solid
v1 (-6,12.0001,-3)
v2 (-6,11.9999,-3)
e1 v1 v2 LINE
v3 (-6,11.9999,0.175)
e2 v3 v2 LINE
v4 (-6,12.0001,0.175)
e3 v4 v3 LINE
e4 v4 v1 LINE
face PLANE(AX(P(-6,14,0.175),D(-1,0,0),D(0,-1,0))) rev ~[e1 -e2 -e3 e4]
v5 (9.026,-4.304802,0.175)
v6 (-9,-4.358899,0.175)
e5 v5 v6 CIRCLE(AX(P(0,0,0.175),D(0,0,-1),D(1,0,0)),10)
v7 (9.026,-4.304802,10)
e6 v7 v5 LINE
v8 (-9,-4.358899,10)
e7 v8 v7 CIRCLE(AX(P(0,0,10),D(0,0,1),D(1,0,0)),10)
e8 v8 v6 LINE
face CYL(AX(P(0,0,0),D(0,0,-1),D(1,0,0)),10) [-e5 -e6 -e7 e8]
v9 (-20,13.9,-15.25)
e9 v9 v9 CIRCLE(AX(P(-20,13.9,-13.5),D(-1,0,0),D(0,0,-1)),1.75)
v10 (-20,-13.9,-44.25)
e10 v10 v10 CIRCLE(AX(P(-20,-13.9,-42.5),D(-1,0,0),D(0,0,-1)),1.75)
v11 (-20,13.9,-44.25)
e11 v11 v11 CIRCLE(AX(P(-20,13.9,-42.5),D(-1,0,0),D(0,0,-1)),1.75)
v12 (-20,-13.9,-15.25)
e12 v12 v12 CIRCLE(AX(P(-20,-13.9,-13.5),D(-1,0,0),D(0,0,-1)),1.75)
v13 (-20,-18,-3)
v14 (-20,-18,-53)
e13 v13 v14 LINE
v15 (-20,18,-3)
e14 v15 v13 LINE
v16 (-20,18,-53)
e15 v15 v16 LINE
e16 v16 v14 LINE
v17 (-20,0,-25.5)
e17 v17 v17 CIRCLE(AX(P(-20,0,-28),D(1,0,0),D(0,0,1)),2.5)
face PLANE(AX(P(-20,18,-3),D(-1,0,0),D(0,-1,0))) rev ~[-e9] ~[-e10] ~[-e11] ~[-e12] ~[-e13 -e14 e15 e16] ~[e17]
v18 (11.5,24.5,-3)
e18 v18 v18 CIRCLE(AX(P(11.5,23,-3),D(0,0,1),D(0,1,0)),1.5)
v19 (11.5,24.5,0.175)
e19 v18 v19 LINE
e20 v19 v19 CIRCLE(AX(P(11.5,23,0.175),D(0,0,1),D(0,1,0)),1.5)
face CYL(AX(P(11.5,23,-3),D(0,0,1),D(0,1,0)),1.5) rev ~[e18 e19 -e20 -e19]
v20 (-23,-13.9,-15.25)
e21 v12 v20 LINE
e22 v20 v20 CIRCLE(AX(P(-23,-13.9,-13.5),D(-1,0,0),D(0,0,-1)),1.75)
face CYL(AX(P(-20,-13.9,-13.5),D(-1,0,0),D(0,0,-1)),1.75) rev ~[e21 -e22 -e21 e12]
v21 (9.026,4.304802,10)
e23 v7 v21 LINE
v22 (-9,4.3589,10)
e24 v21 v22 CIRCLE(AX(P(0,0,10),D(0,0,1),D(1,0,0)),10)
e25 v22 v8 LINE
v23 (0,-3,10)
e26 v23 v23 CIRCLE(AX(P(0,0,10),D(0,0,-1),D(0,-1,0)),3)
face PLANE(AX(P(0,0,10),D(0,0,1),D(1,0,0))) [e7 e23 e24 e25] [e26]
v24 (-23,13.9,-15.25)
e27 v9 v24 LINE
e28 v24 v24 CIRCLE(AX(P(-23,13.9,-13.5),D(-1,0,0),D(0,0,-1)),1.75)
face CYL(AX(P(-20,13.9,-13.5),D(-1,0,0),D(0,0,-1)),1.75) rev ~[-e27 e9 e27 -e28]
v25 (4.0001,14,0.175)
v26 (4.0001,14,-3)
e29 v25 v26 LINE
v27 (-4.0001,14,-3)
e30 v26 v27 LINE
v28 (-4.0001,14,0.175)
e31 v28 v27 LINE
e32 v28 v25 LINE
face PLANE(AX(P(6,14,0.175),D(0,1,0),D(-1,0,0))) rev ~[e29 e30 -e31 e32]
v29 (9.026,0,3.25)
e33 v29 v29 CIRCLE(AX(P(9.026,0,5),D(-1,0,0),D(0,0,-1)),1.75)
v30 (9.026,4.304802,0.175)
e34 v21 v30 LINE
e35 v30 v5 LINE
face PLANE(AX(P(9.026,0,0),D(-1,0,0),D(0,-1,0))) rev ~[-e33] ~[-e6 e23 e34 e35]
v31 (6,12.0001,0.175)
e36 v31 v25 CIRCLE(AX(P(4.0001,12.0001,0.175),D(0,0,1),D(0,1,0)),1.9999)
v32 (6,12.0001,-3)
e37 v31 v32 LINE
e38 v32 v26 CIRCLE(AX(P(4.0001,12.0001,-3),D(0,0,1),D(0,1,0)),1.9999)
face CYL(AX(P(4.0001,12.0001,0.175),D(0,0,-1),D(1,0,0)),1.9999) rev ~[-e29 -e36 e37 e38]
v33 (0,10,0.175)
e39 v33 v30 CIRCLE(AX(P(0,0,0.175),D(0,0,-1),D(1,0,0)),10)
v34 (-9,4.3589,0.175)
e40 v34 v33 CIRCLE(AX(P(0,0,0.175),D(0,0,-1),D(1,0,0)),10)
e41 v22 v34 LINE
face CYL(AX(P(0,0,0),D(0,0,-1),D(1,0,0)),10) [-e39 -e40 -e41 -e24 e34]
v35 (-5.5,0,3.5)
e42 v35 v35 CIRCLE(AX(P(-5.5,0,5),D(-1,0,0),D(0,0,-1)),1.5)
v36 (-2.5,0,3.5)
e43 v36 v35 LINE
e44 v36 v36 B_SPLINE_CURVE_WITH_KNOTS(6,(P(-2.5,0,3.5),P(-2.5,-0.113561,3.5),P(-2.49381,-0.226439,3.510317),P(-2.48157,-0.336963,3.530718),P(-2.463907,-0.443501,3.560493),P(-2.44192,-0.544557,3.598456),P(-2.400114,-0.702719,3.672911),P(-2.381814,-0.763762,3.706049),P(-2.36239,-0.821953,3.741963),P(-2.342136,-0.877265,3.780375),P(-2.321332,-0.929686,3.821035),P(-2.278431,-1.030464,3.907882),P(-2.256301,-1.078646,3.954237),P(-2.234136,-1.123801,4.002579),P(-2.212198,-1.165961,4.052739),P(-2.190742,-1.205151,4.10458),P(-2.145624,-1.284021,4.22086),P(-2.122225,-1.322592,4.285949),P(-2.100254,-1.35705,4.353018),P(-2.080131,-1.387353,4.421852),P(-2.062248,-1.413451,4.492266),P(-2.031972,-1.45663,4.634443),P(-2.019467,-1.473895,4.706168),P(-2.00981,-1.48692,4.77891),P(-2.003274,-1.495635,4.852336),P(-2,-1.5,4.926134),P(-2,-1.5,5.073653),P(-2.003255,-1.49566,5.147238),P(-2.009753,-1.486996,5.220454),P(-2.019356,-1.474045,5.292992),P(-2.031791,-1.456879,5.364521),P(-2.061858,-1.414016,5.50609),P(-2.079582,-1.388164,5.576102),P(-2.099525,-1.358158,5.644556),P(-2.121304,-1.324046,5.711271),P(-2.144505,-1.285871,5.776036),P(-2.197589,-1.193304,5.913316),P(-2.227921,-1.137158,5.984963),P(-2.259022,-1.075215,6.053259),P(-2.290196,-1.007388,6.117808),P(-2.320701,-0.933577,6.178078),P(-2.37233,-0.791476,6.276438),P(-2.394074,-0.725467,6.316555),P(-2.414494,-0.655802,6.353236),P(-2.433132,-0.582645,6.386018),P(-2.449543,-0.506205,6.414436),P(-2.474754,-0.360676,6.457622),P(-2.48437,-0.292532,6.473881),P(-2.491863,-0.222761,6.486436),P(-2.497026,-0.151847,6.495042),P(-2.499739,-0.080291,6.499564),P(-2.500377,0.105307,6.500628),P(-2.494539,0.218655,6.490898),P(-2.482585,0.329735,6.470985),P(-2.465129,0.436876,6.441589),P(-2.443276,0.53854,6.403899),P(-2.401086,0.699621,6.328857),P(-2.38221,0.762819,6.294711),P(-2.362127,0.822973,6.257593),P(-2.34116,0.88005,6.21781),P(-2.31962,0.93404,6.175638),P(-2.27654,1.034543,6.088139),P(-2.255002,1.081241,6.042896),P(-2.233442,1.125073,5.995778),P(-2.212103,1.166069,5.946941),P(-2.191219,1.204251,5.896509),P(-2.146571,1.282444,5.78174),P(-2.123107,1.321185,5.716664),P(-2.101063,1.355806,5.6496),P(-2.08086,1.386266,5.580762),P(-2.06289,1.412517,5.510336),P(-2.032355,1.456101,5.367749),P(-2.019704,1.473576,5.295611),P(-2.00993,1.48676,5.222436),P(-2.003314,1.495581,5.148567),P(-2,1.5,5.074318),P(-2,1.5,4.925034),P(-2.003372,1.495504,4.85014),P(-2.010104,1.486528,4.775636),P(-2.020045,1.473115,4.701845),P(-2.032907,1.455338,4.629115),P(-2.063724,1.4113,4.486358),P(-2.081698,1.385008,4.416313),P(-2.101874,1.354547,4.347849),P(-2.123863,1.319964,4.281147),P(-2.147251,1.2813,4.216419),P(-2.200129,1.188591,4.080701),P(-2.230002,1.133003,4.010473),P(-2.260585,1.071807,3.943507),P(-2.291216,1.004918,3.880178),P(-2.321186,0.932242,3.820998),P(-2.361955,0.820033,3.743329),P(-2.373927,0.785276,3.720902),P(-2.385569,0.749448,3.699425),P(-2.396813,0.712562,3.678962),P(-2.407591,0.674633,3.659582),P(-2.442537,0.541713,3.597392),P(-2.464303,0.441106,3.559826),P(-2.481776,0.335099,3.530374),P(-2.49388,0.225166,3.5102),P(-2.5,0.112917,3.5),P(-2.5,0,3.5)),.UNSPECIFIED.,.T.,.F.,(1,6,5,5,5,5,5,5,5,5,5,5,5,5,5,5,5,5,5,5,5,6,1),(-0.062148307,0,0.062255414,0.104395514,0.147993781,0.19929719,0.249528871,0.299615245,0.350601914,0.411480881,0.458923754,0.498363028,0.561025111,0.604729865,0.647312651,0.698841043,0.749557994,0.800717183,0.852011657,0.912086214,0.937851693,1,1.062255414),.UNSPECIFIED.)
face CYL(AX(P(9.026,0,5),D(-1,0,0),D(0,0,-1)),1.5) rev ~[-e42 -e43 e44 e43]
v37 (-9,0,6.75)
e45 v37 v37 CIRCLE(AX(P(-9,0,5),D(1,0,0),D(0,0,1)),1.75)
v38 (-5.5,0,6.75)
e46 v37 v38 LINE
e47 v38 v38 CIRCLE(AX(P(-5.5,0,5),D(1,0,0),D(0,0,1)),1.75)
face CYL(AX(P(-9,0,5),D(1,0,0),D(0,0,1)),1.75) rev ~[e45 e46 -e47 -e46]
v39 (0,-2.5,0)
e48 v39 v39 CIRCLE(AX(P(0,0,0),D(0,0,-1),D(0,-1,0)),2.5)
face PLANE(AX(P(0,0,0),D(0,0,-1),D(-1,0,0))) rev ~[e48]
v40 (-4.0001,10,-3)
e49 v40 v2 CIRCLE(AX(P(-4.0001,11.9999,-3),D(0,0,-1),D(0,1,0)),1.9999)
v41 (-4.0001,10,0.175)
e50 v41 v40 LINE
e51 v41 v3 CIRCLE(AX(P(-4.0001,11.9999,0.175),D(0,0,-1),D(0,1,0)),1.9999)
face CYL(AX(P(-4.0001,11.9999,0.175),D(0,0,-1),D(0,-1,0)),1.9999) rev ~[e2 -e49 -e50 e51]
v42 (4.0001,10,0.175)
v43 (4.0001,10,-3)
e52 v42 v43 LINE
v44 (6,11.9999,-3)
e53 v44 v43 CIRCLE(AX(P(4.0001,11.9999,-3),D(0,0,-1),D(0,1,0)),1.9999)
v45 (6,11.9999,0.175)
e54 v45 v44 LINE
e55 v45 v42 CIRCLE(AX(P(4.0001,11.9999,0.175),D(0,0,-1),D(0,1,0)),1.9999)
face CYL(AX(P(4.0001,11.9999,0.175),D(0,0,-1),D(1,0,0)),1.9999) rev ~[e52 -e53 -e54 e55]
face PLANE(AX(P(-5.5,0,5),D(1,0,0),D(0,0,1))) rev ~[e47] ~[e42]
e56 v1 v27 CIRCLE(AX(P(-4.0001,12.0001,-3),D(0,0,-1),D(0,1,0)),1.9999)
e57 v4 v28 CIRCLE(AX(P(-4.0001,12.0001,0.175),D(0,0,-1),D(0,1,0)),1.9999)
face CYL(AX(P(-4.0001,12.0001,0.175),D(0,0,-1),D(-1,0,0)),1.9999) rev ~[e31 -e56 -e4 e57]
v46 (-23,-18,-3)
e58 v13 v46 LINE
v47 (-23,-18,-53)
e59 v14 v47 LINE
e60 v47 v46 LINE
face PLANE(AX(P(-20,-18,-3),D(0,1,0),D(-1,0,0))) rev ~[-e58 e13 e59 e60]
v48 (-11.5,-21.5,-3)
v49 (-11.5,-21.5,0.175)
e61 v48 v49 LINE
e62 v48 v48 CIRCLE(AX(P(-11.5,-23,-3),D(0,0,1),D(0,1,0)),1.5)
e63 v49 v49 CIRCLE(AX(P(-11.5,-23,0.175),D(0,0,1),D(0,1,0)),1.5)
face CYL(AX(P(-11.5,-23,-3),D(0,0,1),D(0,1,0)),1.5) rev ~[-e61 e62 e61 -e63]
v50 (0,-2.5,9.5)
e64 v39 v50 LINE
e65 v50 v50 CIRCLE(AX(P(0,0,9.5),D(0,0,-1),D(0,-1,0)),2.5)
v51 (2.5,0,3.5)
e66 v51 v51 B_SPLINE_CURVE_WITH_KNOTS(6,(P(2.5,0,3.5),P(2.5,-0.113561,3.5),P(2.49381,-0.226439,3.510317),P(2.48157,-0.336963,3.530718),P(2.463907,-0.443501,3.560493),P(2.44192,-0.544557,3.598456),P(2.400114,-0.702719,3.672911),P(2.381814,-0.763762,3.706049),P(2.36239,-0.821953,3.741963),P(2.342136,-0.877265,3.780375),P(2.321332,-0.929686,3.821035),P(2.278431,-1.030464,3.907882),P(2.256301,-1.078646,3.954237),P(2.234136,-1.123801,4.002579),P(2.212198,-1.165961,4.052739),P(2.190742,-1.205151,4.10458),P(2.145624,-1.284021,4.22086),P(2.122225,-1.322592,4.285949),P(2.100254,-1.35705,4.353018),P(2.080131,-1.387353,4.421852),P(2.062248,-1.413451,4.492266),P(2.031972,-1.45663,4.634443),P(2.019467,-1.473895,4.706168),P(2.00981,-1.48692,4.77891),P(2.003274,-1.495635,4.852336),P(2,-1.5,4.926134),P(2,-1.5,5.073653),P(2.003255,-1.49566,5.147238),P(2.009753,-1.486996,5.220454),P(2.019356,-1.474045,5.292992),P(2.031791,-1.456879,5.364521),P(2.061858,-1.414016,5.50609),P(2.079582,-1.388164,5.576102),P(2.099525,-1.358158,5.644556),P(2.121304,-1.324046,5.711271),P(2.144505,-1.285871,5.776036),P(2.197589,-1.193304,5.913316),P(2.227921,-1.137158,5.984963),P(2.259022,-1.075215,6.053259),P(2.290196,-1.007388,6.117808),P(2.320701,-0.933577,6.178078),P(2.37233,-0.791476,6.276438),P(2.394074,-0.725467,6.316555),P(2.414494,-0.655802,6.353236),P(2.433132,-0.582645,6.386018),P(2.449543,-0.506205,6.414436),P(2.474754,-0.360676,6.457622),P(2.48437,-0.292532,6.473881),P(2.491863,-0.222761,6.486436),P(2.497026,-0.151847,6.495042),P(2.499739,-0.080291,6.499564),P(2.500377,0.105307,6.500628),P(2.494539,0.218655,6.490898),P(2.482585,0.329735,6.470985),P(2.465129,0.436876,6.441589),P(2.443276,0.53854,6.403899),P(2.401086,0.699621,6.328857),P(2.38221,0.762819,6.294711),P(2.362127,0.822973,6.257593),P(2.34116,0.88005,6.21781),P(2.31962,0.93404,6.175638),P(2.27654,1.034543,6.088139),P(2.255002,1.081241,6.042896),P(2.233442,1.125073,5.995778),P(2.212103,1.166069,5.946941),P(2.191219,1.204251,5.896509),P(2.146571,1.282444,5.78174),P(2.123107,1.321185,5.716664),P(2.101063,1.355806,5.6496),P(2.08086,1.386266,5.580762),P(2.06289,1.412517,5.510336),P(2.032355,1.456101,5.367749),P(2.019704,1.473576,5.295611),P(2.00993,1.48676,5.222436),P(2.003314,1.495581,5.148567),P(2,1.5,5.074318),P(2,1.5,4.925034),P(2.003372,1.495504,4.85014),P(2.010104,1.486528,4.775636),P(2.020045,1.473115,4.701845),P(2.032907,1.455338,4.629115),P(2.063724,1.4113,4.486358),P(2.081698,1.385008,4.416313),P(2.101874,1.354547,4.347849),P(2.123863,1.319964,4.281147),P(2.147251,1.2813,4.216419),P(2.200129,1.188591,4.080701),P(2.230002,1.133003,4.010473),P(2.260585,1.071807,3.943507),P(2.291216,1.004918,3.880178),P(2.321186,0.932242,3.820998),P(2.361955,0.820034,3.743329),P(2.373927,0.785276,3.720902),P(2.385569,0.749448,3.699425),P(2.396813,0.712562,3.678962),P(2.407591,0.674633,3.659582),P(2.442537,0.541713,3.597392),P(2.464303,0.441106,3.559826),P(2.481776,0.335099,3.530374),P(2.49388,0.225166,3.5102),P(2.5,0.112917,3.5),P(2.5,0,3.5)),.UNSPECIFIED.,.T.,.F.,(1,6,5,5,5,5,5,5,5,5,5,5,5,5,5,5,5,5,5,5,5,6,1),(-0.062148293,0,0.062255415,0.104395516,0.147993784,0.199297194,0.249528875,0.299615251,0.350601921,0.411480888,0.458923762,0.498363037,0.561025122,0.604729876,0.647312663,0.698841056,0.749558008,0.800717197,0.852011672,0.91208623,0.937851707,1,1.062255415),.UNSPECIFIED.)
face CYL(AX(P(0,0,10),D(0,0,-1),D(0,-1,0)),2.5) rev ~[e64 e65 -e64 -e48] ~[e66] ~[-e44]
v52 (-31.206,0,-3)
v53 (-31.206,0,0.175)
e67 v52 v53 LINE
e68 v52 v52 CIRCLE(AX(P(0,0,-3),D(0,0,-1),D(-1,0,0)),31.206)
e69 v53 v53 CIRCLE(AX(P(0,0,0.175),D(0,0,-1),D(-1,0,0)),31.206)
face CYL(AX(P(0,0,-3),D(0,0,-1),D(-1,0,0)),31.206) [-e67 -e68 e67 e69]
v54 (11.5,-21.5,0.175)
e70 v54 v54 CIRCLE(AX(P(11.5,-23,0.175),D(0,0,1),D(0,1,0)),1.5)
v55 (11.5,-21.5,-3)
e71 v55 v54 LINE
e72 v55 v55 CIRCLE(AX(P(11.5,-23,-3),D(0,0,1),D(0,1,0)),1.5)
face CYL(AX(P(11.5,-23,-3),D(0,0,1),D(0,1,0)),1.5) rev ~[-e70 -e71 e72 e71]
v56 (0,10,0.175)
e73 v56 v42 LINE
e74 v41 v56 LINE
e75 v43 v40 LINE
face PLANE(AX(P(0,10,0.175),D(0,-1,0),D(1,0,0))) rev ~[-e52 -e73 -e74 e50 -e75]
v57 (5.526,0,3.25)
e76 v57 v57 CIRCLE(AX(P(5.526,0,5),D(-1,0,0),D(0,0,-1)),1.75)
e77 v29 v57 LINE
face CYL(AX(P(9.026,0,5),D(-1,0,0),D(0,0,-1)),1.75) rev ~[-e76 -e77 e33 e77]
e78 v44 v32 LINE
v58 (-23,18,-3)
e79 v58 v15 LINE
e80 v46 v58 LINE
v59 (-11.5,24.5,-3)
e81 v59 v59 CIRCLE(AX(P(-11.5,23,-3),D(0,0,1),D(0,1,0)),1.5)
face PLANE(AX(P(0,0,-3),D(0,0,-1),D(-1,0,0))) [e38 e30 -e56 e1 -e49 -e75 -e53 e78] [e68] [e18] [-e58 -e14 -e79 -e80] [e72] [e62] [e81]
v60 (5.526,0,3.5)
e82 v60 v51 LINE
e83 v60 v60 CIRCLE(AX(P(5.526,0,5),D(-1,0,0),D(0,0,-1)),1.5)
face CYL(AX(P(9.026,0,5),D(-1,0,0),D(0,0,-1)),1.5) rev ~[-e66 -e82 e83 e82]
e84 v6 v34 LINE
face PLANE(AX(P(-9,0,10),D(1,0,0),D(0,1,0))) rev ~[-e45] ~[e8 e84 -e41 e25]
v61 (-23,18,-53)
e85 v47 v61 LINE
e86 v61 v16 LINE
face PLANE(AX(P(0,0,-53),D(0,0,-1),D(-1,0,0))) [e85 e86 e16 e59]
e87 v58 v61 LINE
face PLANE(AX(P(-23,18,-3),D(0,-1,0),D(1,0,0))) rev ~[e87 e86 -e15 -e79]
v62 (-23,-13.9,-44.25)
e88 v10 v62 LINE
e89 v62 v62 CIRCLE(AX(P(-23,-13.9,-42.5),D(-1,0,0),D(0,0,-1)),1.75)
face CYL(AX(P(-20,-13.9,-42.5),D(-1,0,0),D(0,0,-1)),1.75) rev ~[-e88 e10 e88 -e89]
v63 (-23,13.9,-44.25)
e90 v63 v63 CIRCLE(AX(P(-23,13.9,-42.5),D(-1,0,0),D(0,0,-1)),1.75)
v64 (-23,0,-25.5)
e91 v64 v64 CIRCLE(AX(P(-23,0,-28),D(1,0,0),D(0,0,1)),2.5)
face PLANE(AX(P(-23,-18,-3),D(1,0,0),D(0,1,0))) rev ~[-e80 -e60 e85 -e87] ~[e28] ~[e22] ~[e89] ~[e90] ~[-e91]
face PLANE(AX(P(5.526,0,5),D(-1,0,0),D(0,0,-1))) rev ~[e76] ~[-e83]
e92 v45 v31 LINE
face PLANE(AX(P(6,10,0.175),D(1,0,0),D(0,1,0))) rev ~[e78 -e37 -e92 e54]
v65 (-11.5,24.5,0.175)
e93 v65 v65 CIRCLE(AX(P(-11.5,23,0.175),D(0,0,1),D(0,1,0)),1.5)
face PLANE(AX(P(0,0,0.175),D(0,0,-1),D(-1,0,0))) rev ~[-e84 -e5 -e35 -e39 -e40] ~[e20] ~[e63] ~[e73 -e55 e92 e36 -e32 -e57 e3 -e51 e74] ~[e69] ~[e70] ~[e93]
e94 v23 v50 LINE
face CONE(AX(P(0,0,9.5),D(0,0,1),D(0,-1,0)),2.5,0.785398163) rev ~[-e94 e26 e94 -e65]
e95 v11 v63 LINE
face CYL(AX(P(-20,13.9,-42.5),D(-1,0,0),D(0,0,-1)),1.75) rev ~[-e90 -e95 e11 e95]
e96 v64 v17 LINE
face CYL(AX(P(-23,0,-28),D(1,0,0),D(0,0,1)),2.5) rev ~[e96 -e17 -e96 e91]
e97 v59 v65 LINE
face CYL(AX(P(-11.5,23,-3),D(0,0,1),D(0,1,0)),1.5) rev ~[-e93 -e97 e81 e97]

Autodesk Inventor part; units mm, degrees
ref_plane "YZ Plane" through (0, 0, 0) normal (1, 0, 0) x (0, 1, 0)
ref_plane "XZ Plane" through (0, 0, 0) normal (0, 1, 0) x (-1, 0, 0)
ref_plane "XY Plane" through (0, 0, 0) normal (0, 0, 1) x (1, 0, 0)
sketch "Sketch1" plane through (0, 0, 0) normal (0, 0, 1) x (1, 0, 0)
  circle A0 centre (0, 0) radius 10
  dimension "d0" = 20
extrude "Extrusion1" add sketch "Sketch1" along normal blind 10
sketch "Sketch2" plane through (0, 0, 10) normal (0, 0, 1) x (1, 0, 0)
  point P0 (0, 0)
  point P1 (0, 0)
hole "Hole1" at (0, 0, 10) direction (0, 0, -1) diameter 5 end through all
chamfer "Chamfer1" distance 0.5 angle 45 1 edges at (0, 2.5, 10)
sketch "Sketch3" plane through (0, 0, 10) normal (0, 0, 1) x (1, 0, 0)
  circle A0 centre (0, 0) radius 10 projected
  line L0 (-10, 0) -> (-9, 0)
  line L1 (-9, 0) -> (-9, 4.3589)
  line L2 (-9, 4.3589) -> (-10, 4.3589)
  line L3 (-10, 4.3589) -> (-10, 0)
  line L4 (-10, 0) -> (-9, 0)
  line L5 (-9, 0) -> (-9, -4.4002)
  line L6 (-9, -4.4002) -> (-10, -4.4002)
  line L7 (-10, -4.4002) -> (-10, 0)
  line L8 (10.026, 0) -> (9.026, 0)
  line L9 (9.026, 0) -> (9.026, 4.3589)
  line L10 (9.026, 4.3589) -> (10.026, 4.3589)
  line L11 (10.026, 4.3589) -> (10.026, 0)
  line L12 (10.026, 0) -> (9.026, 0)
  line L13 (9.026, 0) -> (9.026, -4.4002)
  line L14 (9.026, -4.4002) -> (10.026, -4.4002)
  line L15 (10.026, -4.4002) -> (10.026, 0)
  dimension "d13" = 1
  dimension "d14" = 1
  dimension "d15" = 1
extrude "Extrusion2" cut sketch "Sketch3" against normal blind 10 contours L1 L0 A0 | L0 L5 A0 | A0 L5 L6 L7 | L9 L10 L11 L8 A0 | A0 L8 L9 | L8 L15 L14 L13 A0 | A0 L13 L8
sketch "Sketch4" plane through (9.026, -4.3048, 10) normal (1, 0, 0) x (0, 0, -1)
  line L0 (10, 4.3048) -> (5, 4.3048)
  line L1 (0.5, 1.8048) -> (0.5, 6.8048) projected
  dimension "d18" = 5
hole "Hole2" at (9.026, 0, 5) direction (-1, 0, 0) diameter 3 end through all
sketch "Sketch5" plane through (9.026, -4.3048, 10) normal (1, 0, 0) x (0, 0, -1)
  circle A0 centre (5, 4.3048) radius 1.5 projected
  point P0 (10, 4.3048)
hole "Hole3" at (9.026, 0, 5) direction (-1, 0, 0) diameter 3.5 depth 3.5
sketch "Sketch6" plane through (-9, -4.3589, 10) normal (-1, 0, 0) x (0, 0, 1)
  circle A0 centre (-5, 4.3589) radius 1.5 projected
  point P0 (-10, 4.3589)
hole "Hole4" at (-9, 0, 5) direction (1, 0, 0) diameter 3.5 depth 3.5
sketch "Sketch7" plane through (0, 0, 0) normal (0, 0, -1) x (-1, 0, 0)
  line L0 (0, 0) -> (-9.026, 0)
  line L1 (-9.026, 0) -> (-9.026, 18)
  line L2 (-9.026, 18) -> (0, 18)
  line L3 (0, 18) -> (0, 0)
  line L4 (0, 0) -> (-9.026, 0)
  line L5 (-9.026, 0) -> (-9.026, -18)
  line L6 (-9.026, -18) -> (0, -18)
  line L7 (0, -18) -> (0, 0)
  line L8 (0, 18) -> (23, 18)
  line L9 (23, 18) -> (23, -18)
  line L10 (23, -18) -> (0, -18)
  line L11 (0, -18) -> (0, 18)
  dimension "d40" = 9.026
  dimension "d41" = 18
  dimension "d42" = 18
  dimension "d43" = 23
extrude "Extrusion3" add sketch "Sketch7" along normal blind 3
sketch "Sketch8" plane through (0, 0, -3) normal (0, 0, -1) x (-1, 0, 0)
  line L0 (23, 18) -> (-9.026, 18) projected
  line L1 (-9.026, -18) -> (23, -18) projected
  line L2 (23, 18) -> (20, 18)
  line L3 (20, 18) -> (20, -18)
  line L4 (20, -18) -> (23, -18)
  line L5 (23, -18) -> (23, 18)
  point P0 (0, 0)
  dimension "d46" = 3
extrude "Extrusion4" add sketch "Sketch8" along normal blind 50
sketch "Sketch9" plane through (-20, -18, -3) normal (1, 0, 0) x (0, 0, -1)
  line L0 (0, 0) -> (0, 36) projected
  line L1 (0, 36) -> (25, 36)
  line L2 (-3, 36) -> (50, 36) projected
  line L3 (25, 36) -> (25, 18)
  line L4 (-3, 0) -> (50, 0) projected
  line L5 (25, 18) -> (39.5, 18)
  line L6 (39.5, 18) -> (39.5, 31.9)
  line L7 (39.5, 31.9) -> (25, 31.9)
  line L8 (25, 31.9) -> (25, 18)
  line L9 (25, 18) -> (39.5, 18)
  line L10 (39.5, 18) -> (39.5, 4.1)
  line L11 (39.5, 4.1) -> (25, 4.1)
  line L12 (25, 4.1) -> (25, 18)
  line L13 (25, 18) -> (10.5, 18)
  line L14 (10.5, 18) -> (10.5, 31.9)
  line L15 (10.5, 31.9) -> (25, 31.9)
  line L16 (25, 31.9) -> (25, 18)
  line L17 (25, 18) -> (10.5, 18)
  line L18 (10.5, 18) -> (10.5, 4.1)
  line L19 (10.5, 4.1) -> (25, 4.1)
  line L20 (25, 4.1) -> (25, 18)
  point P0 (-3, 18)
  dimension "d49" = 25
  dimension "d50" = 18
  dimension "d51" = 14.5
  dimension "d52" = 13.9
  dimension "d53" = 13.9
  dimension "d54" = 14.5
hole "Hole5" at (-20, 13.9, -13.5) at (-20, 13.9, -42.5) at (-20, -13.9, -42.5) at (-20, -13.9, -13.5) direction (-1, 0, 0) diameter 3.5 end through all
sketch "Sketch10" plane through (0, 0, -3) normal (0, 0, -1) x (-1, 0, 0)
  line L0 (-9.026, -18) -> (23, -18) projected
  circle A0 centre (0, 0) radius 29.2062
  circle A1 centre (0, 0) radius 2.5 projected
  circle A2 centre (0, 0) radius 31.206
  dimension "d62" = 62.412
extrude "Extrusion5" add sketch "Sketch10" against normal blind 3.175 contours A0 | A2
sketch "Sketch11" plane through (0, 0, -3) normal (0, 0, -1) x (-1, 0, 0)
  line L0 (23, -18) -> (23, 18) projected
  circle A0 centre (0, 0) radius 29.2062
  line L1 (23, 18) -> (-23, 18)
  line L2 (-23, 18) -> (-23, -18)
  line L3 (-23, -18) -> (23, -18)
  line L4 (23, -18) -> (23, 18)
  circle A1 centre (0, 0) radius 2.5 projected
  line L5 (0, 0) -> (0, 23)
  line L6 (0, 23) -> (11.5, 23)
  line L7 (11.5, 23) -> (-11.5, 23)
  line L8 (-11.5, 23) -> (-11.5, -23)
  line L9 (-11.5, -23) -> (11.5, -23)
  line L10 (11.5, -23) -> (11.5, 23)
  dimension "d65" = 23
  dimension "d66" = 11.5
  dimension "d67" = 23
  dimension "d68" = 46
hole "Hole6" at (11.5, 23, -3) at (-11.5, 23, -3) at (11.5, -23, -3) at (-11.5, -23, -3) direction (0, 0, 1) diameter 3 depth 3.5
sketch "Sketch12" plane through (-20, -18, -3) normal (1, 0, 0) x (0, 0, -1)
  line L0 (0, 0) -> (0, 36) projected
  line L1 (50, 0) -> (50, 36) projected
  point P0 (-3, 18)
  point P1 (25, 18)
sketch "Sketch13" plane through (0, 0, 0.175) normal (0, 0, 1) x (1, 0, 0)
  arc A0 (9.026, 4.3048) -> (-9, 4.3589) centre (0, 0) ccw projected
  line L0 (0, 10) -> (6, 10)
  line L1 (6, 10) -> (6, 14)
  line L2 (6, 14) -> (0, 14)
  line L3 (0, 14) -> (0, 10)
  line L4 (6, 14) -> (-6, 14)
  line L5 (-6, 14) -> (-6, 10)
  line L6 (-6, 10) -> (6, 10)
  line L7 (6, 10) -> (6, 14)
  dimension "d76" = 6
  dimension "d77" = 4
  dimension "d78" = 12
extrude "Extrusion6" cut sketch "Sketch13" against normal blind 3.175
fillet "Fillet1" radius 2 4 edges at (-6, 14, -1.4125) (6, 14, -1.4125) (6, 10, -1.4125) (-6, 10, -1.4125)
sketch "Sketch14" plane through (-23, -18, -3) normal (-1, 0, 0) x (0, 0, 1)
  circle A0 centre (-39.5, 31.9) radius 1.75 projected
  circle A1 centre (-10.5, 4.1) radius 1.75 projected
  line L0 (-39.5, 31.9) -> (-10.5, 4.1)
  circle A2 centre (-39.5, 4.1) radius 1.75 projected
  line L1 (-10.5, 4.1) -> (-39.5, 4.1)
  circle A3 centre (-10.5, 31.9) radius 1.75 projected
  line L2 (-39.5, 4.1) -> (-10.5, 31.9)
  point P0 (3, 18)
  point P1 (-25, 18)
hole "Hole7" at (-23, 0, -28) direction (1, 0, 0) diameter 5 end through all
properties part number "LidarLiteV3Mount"
